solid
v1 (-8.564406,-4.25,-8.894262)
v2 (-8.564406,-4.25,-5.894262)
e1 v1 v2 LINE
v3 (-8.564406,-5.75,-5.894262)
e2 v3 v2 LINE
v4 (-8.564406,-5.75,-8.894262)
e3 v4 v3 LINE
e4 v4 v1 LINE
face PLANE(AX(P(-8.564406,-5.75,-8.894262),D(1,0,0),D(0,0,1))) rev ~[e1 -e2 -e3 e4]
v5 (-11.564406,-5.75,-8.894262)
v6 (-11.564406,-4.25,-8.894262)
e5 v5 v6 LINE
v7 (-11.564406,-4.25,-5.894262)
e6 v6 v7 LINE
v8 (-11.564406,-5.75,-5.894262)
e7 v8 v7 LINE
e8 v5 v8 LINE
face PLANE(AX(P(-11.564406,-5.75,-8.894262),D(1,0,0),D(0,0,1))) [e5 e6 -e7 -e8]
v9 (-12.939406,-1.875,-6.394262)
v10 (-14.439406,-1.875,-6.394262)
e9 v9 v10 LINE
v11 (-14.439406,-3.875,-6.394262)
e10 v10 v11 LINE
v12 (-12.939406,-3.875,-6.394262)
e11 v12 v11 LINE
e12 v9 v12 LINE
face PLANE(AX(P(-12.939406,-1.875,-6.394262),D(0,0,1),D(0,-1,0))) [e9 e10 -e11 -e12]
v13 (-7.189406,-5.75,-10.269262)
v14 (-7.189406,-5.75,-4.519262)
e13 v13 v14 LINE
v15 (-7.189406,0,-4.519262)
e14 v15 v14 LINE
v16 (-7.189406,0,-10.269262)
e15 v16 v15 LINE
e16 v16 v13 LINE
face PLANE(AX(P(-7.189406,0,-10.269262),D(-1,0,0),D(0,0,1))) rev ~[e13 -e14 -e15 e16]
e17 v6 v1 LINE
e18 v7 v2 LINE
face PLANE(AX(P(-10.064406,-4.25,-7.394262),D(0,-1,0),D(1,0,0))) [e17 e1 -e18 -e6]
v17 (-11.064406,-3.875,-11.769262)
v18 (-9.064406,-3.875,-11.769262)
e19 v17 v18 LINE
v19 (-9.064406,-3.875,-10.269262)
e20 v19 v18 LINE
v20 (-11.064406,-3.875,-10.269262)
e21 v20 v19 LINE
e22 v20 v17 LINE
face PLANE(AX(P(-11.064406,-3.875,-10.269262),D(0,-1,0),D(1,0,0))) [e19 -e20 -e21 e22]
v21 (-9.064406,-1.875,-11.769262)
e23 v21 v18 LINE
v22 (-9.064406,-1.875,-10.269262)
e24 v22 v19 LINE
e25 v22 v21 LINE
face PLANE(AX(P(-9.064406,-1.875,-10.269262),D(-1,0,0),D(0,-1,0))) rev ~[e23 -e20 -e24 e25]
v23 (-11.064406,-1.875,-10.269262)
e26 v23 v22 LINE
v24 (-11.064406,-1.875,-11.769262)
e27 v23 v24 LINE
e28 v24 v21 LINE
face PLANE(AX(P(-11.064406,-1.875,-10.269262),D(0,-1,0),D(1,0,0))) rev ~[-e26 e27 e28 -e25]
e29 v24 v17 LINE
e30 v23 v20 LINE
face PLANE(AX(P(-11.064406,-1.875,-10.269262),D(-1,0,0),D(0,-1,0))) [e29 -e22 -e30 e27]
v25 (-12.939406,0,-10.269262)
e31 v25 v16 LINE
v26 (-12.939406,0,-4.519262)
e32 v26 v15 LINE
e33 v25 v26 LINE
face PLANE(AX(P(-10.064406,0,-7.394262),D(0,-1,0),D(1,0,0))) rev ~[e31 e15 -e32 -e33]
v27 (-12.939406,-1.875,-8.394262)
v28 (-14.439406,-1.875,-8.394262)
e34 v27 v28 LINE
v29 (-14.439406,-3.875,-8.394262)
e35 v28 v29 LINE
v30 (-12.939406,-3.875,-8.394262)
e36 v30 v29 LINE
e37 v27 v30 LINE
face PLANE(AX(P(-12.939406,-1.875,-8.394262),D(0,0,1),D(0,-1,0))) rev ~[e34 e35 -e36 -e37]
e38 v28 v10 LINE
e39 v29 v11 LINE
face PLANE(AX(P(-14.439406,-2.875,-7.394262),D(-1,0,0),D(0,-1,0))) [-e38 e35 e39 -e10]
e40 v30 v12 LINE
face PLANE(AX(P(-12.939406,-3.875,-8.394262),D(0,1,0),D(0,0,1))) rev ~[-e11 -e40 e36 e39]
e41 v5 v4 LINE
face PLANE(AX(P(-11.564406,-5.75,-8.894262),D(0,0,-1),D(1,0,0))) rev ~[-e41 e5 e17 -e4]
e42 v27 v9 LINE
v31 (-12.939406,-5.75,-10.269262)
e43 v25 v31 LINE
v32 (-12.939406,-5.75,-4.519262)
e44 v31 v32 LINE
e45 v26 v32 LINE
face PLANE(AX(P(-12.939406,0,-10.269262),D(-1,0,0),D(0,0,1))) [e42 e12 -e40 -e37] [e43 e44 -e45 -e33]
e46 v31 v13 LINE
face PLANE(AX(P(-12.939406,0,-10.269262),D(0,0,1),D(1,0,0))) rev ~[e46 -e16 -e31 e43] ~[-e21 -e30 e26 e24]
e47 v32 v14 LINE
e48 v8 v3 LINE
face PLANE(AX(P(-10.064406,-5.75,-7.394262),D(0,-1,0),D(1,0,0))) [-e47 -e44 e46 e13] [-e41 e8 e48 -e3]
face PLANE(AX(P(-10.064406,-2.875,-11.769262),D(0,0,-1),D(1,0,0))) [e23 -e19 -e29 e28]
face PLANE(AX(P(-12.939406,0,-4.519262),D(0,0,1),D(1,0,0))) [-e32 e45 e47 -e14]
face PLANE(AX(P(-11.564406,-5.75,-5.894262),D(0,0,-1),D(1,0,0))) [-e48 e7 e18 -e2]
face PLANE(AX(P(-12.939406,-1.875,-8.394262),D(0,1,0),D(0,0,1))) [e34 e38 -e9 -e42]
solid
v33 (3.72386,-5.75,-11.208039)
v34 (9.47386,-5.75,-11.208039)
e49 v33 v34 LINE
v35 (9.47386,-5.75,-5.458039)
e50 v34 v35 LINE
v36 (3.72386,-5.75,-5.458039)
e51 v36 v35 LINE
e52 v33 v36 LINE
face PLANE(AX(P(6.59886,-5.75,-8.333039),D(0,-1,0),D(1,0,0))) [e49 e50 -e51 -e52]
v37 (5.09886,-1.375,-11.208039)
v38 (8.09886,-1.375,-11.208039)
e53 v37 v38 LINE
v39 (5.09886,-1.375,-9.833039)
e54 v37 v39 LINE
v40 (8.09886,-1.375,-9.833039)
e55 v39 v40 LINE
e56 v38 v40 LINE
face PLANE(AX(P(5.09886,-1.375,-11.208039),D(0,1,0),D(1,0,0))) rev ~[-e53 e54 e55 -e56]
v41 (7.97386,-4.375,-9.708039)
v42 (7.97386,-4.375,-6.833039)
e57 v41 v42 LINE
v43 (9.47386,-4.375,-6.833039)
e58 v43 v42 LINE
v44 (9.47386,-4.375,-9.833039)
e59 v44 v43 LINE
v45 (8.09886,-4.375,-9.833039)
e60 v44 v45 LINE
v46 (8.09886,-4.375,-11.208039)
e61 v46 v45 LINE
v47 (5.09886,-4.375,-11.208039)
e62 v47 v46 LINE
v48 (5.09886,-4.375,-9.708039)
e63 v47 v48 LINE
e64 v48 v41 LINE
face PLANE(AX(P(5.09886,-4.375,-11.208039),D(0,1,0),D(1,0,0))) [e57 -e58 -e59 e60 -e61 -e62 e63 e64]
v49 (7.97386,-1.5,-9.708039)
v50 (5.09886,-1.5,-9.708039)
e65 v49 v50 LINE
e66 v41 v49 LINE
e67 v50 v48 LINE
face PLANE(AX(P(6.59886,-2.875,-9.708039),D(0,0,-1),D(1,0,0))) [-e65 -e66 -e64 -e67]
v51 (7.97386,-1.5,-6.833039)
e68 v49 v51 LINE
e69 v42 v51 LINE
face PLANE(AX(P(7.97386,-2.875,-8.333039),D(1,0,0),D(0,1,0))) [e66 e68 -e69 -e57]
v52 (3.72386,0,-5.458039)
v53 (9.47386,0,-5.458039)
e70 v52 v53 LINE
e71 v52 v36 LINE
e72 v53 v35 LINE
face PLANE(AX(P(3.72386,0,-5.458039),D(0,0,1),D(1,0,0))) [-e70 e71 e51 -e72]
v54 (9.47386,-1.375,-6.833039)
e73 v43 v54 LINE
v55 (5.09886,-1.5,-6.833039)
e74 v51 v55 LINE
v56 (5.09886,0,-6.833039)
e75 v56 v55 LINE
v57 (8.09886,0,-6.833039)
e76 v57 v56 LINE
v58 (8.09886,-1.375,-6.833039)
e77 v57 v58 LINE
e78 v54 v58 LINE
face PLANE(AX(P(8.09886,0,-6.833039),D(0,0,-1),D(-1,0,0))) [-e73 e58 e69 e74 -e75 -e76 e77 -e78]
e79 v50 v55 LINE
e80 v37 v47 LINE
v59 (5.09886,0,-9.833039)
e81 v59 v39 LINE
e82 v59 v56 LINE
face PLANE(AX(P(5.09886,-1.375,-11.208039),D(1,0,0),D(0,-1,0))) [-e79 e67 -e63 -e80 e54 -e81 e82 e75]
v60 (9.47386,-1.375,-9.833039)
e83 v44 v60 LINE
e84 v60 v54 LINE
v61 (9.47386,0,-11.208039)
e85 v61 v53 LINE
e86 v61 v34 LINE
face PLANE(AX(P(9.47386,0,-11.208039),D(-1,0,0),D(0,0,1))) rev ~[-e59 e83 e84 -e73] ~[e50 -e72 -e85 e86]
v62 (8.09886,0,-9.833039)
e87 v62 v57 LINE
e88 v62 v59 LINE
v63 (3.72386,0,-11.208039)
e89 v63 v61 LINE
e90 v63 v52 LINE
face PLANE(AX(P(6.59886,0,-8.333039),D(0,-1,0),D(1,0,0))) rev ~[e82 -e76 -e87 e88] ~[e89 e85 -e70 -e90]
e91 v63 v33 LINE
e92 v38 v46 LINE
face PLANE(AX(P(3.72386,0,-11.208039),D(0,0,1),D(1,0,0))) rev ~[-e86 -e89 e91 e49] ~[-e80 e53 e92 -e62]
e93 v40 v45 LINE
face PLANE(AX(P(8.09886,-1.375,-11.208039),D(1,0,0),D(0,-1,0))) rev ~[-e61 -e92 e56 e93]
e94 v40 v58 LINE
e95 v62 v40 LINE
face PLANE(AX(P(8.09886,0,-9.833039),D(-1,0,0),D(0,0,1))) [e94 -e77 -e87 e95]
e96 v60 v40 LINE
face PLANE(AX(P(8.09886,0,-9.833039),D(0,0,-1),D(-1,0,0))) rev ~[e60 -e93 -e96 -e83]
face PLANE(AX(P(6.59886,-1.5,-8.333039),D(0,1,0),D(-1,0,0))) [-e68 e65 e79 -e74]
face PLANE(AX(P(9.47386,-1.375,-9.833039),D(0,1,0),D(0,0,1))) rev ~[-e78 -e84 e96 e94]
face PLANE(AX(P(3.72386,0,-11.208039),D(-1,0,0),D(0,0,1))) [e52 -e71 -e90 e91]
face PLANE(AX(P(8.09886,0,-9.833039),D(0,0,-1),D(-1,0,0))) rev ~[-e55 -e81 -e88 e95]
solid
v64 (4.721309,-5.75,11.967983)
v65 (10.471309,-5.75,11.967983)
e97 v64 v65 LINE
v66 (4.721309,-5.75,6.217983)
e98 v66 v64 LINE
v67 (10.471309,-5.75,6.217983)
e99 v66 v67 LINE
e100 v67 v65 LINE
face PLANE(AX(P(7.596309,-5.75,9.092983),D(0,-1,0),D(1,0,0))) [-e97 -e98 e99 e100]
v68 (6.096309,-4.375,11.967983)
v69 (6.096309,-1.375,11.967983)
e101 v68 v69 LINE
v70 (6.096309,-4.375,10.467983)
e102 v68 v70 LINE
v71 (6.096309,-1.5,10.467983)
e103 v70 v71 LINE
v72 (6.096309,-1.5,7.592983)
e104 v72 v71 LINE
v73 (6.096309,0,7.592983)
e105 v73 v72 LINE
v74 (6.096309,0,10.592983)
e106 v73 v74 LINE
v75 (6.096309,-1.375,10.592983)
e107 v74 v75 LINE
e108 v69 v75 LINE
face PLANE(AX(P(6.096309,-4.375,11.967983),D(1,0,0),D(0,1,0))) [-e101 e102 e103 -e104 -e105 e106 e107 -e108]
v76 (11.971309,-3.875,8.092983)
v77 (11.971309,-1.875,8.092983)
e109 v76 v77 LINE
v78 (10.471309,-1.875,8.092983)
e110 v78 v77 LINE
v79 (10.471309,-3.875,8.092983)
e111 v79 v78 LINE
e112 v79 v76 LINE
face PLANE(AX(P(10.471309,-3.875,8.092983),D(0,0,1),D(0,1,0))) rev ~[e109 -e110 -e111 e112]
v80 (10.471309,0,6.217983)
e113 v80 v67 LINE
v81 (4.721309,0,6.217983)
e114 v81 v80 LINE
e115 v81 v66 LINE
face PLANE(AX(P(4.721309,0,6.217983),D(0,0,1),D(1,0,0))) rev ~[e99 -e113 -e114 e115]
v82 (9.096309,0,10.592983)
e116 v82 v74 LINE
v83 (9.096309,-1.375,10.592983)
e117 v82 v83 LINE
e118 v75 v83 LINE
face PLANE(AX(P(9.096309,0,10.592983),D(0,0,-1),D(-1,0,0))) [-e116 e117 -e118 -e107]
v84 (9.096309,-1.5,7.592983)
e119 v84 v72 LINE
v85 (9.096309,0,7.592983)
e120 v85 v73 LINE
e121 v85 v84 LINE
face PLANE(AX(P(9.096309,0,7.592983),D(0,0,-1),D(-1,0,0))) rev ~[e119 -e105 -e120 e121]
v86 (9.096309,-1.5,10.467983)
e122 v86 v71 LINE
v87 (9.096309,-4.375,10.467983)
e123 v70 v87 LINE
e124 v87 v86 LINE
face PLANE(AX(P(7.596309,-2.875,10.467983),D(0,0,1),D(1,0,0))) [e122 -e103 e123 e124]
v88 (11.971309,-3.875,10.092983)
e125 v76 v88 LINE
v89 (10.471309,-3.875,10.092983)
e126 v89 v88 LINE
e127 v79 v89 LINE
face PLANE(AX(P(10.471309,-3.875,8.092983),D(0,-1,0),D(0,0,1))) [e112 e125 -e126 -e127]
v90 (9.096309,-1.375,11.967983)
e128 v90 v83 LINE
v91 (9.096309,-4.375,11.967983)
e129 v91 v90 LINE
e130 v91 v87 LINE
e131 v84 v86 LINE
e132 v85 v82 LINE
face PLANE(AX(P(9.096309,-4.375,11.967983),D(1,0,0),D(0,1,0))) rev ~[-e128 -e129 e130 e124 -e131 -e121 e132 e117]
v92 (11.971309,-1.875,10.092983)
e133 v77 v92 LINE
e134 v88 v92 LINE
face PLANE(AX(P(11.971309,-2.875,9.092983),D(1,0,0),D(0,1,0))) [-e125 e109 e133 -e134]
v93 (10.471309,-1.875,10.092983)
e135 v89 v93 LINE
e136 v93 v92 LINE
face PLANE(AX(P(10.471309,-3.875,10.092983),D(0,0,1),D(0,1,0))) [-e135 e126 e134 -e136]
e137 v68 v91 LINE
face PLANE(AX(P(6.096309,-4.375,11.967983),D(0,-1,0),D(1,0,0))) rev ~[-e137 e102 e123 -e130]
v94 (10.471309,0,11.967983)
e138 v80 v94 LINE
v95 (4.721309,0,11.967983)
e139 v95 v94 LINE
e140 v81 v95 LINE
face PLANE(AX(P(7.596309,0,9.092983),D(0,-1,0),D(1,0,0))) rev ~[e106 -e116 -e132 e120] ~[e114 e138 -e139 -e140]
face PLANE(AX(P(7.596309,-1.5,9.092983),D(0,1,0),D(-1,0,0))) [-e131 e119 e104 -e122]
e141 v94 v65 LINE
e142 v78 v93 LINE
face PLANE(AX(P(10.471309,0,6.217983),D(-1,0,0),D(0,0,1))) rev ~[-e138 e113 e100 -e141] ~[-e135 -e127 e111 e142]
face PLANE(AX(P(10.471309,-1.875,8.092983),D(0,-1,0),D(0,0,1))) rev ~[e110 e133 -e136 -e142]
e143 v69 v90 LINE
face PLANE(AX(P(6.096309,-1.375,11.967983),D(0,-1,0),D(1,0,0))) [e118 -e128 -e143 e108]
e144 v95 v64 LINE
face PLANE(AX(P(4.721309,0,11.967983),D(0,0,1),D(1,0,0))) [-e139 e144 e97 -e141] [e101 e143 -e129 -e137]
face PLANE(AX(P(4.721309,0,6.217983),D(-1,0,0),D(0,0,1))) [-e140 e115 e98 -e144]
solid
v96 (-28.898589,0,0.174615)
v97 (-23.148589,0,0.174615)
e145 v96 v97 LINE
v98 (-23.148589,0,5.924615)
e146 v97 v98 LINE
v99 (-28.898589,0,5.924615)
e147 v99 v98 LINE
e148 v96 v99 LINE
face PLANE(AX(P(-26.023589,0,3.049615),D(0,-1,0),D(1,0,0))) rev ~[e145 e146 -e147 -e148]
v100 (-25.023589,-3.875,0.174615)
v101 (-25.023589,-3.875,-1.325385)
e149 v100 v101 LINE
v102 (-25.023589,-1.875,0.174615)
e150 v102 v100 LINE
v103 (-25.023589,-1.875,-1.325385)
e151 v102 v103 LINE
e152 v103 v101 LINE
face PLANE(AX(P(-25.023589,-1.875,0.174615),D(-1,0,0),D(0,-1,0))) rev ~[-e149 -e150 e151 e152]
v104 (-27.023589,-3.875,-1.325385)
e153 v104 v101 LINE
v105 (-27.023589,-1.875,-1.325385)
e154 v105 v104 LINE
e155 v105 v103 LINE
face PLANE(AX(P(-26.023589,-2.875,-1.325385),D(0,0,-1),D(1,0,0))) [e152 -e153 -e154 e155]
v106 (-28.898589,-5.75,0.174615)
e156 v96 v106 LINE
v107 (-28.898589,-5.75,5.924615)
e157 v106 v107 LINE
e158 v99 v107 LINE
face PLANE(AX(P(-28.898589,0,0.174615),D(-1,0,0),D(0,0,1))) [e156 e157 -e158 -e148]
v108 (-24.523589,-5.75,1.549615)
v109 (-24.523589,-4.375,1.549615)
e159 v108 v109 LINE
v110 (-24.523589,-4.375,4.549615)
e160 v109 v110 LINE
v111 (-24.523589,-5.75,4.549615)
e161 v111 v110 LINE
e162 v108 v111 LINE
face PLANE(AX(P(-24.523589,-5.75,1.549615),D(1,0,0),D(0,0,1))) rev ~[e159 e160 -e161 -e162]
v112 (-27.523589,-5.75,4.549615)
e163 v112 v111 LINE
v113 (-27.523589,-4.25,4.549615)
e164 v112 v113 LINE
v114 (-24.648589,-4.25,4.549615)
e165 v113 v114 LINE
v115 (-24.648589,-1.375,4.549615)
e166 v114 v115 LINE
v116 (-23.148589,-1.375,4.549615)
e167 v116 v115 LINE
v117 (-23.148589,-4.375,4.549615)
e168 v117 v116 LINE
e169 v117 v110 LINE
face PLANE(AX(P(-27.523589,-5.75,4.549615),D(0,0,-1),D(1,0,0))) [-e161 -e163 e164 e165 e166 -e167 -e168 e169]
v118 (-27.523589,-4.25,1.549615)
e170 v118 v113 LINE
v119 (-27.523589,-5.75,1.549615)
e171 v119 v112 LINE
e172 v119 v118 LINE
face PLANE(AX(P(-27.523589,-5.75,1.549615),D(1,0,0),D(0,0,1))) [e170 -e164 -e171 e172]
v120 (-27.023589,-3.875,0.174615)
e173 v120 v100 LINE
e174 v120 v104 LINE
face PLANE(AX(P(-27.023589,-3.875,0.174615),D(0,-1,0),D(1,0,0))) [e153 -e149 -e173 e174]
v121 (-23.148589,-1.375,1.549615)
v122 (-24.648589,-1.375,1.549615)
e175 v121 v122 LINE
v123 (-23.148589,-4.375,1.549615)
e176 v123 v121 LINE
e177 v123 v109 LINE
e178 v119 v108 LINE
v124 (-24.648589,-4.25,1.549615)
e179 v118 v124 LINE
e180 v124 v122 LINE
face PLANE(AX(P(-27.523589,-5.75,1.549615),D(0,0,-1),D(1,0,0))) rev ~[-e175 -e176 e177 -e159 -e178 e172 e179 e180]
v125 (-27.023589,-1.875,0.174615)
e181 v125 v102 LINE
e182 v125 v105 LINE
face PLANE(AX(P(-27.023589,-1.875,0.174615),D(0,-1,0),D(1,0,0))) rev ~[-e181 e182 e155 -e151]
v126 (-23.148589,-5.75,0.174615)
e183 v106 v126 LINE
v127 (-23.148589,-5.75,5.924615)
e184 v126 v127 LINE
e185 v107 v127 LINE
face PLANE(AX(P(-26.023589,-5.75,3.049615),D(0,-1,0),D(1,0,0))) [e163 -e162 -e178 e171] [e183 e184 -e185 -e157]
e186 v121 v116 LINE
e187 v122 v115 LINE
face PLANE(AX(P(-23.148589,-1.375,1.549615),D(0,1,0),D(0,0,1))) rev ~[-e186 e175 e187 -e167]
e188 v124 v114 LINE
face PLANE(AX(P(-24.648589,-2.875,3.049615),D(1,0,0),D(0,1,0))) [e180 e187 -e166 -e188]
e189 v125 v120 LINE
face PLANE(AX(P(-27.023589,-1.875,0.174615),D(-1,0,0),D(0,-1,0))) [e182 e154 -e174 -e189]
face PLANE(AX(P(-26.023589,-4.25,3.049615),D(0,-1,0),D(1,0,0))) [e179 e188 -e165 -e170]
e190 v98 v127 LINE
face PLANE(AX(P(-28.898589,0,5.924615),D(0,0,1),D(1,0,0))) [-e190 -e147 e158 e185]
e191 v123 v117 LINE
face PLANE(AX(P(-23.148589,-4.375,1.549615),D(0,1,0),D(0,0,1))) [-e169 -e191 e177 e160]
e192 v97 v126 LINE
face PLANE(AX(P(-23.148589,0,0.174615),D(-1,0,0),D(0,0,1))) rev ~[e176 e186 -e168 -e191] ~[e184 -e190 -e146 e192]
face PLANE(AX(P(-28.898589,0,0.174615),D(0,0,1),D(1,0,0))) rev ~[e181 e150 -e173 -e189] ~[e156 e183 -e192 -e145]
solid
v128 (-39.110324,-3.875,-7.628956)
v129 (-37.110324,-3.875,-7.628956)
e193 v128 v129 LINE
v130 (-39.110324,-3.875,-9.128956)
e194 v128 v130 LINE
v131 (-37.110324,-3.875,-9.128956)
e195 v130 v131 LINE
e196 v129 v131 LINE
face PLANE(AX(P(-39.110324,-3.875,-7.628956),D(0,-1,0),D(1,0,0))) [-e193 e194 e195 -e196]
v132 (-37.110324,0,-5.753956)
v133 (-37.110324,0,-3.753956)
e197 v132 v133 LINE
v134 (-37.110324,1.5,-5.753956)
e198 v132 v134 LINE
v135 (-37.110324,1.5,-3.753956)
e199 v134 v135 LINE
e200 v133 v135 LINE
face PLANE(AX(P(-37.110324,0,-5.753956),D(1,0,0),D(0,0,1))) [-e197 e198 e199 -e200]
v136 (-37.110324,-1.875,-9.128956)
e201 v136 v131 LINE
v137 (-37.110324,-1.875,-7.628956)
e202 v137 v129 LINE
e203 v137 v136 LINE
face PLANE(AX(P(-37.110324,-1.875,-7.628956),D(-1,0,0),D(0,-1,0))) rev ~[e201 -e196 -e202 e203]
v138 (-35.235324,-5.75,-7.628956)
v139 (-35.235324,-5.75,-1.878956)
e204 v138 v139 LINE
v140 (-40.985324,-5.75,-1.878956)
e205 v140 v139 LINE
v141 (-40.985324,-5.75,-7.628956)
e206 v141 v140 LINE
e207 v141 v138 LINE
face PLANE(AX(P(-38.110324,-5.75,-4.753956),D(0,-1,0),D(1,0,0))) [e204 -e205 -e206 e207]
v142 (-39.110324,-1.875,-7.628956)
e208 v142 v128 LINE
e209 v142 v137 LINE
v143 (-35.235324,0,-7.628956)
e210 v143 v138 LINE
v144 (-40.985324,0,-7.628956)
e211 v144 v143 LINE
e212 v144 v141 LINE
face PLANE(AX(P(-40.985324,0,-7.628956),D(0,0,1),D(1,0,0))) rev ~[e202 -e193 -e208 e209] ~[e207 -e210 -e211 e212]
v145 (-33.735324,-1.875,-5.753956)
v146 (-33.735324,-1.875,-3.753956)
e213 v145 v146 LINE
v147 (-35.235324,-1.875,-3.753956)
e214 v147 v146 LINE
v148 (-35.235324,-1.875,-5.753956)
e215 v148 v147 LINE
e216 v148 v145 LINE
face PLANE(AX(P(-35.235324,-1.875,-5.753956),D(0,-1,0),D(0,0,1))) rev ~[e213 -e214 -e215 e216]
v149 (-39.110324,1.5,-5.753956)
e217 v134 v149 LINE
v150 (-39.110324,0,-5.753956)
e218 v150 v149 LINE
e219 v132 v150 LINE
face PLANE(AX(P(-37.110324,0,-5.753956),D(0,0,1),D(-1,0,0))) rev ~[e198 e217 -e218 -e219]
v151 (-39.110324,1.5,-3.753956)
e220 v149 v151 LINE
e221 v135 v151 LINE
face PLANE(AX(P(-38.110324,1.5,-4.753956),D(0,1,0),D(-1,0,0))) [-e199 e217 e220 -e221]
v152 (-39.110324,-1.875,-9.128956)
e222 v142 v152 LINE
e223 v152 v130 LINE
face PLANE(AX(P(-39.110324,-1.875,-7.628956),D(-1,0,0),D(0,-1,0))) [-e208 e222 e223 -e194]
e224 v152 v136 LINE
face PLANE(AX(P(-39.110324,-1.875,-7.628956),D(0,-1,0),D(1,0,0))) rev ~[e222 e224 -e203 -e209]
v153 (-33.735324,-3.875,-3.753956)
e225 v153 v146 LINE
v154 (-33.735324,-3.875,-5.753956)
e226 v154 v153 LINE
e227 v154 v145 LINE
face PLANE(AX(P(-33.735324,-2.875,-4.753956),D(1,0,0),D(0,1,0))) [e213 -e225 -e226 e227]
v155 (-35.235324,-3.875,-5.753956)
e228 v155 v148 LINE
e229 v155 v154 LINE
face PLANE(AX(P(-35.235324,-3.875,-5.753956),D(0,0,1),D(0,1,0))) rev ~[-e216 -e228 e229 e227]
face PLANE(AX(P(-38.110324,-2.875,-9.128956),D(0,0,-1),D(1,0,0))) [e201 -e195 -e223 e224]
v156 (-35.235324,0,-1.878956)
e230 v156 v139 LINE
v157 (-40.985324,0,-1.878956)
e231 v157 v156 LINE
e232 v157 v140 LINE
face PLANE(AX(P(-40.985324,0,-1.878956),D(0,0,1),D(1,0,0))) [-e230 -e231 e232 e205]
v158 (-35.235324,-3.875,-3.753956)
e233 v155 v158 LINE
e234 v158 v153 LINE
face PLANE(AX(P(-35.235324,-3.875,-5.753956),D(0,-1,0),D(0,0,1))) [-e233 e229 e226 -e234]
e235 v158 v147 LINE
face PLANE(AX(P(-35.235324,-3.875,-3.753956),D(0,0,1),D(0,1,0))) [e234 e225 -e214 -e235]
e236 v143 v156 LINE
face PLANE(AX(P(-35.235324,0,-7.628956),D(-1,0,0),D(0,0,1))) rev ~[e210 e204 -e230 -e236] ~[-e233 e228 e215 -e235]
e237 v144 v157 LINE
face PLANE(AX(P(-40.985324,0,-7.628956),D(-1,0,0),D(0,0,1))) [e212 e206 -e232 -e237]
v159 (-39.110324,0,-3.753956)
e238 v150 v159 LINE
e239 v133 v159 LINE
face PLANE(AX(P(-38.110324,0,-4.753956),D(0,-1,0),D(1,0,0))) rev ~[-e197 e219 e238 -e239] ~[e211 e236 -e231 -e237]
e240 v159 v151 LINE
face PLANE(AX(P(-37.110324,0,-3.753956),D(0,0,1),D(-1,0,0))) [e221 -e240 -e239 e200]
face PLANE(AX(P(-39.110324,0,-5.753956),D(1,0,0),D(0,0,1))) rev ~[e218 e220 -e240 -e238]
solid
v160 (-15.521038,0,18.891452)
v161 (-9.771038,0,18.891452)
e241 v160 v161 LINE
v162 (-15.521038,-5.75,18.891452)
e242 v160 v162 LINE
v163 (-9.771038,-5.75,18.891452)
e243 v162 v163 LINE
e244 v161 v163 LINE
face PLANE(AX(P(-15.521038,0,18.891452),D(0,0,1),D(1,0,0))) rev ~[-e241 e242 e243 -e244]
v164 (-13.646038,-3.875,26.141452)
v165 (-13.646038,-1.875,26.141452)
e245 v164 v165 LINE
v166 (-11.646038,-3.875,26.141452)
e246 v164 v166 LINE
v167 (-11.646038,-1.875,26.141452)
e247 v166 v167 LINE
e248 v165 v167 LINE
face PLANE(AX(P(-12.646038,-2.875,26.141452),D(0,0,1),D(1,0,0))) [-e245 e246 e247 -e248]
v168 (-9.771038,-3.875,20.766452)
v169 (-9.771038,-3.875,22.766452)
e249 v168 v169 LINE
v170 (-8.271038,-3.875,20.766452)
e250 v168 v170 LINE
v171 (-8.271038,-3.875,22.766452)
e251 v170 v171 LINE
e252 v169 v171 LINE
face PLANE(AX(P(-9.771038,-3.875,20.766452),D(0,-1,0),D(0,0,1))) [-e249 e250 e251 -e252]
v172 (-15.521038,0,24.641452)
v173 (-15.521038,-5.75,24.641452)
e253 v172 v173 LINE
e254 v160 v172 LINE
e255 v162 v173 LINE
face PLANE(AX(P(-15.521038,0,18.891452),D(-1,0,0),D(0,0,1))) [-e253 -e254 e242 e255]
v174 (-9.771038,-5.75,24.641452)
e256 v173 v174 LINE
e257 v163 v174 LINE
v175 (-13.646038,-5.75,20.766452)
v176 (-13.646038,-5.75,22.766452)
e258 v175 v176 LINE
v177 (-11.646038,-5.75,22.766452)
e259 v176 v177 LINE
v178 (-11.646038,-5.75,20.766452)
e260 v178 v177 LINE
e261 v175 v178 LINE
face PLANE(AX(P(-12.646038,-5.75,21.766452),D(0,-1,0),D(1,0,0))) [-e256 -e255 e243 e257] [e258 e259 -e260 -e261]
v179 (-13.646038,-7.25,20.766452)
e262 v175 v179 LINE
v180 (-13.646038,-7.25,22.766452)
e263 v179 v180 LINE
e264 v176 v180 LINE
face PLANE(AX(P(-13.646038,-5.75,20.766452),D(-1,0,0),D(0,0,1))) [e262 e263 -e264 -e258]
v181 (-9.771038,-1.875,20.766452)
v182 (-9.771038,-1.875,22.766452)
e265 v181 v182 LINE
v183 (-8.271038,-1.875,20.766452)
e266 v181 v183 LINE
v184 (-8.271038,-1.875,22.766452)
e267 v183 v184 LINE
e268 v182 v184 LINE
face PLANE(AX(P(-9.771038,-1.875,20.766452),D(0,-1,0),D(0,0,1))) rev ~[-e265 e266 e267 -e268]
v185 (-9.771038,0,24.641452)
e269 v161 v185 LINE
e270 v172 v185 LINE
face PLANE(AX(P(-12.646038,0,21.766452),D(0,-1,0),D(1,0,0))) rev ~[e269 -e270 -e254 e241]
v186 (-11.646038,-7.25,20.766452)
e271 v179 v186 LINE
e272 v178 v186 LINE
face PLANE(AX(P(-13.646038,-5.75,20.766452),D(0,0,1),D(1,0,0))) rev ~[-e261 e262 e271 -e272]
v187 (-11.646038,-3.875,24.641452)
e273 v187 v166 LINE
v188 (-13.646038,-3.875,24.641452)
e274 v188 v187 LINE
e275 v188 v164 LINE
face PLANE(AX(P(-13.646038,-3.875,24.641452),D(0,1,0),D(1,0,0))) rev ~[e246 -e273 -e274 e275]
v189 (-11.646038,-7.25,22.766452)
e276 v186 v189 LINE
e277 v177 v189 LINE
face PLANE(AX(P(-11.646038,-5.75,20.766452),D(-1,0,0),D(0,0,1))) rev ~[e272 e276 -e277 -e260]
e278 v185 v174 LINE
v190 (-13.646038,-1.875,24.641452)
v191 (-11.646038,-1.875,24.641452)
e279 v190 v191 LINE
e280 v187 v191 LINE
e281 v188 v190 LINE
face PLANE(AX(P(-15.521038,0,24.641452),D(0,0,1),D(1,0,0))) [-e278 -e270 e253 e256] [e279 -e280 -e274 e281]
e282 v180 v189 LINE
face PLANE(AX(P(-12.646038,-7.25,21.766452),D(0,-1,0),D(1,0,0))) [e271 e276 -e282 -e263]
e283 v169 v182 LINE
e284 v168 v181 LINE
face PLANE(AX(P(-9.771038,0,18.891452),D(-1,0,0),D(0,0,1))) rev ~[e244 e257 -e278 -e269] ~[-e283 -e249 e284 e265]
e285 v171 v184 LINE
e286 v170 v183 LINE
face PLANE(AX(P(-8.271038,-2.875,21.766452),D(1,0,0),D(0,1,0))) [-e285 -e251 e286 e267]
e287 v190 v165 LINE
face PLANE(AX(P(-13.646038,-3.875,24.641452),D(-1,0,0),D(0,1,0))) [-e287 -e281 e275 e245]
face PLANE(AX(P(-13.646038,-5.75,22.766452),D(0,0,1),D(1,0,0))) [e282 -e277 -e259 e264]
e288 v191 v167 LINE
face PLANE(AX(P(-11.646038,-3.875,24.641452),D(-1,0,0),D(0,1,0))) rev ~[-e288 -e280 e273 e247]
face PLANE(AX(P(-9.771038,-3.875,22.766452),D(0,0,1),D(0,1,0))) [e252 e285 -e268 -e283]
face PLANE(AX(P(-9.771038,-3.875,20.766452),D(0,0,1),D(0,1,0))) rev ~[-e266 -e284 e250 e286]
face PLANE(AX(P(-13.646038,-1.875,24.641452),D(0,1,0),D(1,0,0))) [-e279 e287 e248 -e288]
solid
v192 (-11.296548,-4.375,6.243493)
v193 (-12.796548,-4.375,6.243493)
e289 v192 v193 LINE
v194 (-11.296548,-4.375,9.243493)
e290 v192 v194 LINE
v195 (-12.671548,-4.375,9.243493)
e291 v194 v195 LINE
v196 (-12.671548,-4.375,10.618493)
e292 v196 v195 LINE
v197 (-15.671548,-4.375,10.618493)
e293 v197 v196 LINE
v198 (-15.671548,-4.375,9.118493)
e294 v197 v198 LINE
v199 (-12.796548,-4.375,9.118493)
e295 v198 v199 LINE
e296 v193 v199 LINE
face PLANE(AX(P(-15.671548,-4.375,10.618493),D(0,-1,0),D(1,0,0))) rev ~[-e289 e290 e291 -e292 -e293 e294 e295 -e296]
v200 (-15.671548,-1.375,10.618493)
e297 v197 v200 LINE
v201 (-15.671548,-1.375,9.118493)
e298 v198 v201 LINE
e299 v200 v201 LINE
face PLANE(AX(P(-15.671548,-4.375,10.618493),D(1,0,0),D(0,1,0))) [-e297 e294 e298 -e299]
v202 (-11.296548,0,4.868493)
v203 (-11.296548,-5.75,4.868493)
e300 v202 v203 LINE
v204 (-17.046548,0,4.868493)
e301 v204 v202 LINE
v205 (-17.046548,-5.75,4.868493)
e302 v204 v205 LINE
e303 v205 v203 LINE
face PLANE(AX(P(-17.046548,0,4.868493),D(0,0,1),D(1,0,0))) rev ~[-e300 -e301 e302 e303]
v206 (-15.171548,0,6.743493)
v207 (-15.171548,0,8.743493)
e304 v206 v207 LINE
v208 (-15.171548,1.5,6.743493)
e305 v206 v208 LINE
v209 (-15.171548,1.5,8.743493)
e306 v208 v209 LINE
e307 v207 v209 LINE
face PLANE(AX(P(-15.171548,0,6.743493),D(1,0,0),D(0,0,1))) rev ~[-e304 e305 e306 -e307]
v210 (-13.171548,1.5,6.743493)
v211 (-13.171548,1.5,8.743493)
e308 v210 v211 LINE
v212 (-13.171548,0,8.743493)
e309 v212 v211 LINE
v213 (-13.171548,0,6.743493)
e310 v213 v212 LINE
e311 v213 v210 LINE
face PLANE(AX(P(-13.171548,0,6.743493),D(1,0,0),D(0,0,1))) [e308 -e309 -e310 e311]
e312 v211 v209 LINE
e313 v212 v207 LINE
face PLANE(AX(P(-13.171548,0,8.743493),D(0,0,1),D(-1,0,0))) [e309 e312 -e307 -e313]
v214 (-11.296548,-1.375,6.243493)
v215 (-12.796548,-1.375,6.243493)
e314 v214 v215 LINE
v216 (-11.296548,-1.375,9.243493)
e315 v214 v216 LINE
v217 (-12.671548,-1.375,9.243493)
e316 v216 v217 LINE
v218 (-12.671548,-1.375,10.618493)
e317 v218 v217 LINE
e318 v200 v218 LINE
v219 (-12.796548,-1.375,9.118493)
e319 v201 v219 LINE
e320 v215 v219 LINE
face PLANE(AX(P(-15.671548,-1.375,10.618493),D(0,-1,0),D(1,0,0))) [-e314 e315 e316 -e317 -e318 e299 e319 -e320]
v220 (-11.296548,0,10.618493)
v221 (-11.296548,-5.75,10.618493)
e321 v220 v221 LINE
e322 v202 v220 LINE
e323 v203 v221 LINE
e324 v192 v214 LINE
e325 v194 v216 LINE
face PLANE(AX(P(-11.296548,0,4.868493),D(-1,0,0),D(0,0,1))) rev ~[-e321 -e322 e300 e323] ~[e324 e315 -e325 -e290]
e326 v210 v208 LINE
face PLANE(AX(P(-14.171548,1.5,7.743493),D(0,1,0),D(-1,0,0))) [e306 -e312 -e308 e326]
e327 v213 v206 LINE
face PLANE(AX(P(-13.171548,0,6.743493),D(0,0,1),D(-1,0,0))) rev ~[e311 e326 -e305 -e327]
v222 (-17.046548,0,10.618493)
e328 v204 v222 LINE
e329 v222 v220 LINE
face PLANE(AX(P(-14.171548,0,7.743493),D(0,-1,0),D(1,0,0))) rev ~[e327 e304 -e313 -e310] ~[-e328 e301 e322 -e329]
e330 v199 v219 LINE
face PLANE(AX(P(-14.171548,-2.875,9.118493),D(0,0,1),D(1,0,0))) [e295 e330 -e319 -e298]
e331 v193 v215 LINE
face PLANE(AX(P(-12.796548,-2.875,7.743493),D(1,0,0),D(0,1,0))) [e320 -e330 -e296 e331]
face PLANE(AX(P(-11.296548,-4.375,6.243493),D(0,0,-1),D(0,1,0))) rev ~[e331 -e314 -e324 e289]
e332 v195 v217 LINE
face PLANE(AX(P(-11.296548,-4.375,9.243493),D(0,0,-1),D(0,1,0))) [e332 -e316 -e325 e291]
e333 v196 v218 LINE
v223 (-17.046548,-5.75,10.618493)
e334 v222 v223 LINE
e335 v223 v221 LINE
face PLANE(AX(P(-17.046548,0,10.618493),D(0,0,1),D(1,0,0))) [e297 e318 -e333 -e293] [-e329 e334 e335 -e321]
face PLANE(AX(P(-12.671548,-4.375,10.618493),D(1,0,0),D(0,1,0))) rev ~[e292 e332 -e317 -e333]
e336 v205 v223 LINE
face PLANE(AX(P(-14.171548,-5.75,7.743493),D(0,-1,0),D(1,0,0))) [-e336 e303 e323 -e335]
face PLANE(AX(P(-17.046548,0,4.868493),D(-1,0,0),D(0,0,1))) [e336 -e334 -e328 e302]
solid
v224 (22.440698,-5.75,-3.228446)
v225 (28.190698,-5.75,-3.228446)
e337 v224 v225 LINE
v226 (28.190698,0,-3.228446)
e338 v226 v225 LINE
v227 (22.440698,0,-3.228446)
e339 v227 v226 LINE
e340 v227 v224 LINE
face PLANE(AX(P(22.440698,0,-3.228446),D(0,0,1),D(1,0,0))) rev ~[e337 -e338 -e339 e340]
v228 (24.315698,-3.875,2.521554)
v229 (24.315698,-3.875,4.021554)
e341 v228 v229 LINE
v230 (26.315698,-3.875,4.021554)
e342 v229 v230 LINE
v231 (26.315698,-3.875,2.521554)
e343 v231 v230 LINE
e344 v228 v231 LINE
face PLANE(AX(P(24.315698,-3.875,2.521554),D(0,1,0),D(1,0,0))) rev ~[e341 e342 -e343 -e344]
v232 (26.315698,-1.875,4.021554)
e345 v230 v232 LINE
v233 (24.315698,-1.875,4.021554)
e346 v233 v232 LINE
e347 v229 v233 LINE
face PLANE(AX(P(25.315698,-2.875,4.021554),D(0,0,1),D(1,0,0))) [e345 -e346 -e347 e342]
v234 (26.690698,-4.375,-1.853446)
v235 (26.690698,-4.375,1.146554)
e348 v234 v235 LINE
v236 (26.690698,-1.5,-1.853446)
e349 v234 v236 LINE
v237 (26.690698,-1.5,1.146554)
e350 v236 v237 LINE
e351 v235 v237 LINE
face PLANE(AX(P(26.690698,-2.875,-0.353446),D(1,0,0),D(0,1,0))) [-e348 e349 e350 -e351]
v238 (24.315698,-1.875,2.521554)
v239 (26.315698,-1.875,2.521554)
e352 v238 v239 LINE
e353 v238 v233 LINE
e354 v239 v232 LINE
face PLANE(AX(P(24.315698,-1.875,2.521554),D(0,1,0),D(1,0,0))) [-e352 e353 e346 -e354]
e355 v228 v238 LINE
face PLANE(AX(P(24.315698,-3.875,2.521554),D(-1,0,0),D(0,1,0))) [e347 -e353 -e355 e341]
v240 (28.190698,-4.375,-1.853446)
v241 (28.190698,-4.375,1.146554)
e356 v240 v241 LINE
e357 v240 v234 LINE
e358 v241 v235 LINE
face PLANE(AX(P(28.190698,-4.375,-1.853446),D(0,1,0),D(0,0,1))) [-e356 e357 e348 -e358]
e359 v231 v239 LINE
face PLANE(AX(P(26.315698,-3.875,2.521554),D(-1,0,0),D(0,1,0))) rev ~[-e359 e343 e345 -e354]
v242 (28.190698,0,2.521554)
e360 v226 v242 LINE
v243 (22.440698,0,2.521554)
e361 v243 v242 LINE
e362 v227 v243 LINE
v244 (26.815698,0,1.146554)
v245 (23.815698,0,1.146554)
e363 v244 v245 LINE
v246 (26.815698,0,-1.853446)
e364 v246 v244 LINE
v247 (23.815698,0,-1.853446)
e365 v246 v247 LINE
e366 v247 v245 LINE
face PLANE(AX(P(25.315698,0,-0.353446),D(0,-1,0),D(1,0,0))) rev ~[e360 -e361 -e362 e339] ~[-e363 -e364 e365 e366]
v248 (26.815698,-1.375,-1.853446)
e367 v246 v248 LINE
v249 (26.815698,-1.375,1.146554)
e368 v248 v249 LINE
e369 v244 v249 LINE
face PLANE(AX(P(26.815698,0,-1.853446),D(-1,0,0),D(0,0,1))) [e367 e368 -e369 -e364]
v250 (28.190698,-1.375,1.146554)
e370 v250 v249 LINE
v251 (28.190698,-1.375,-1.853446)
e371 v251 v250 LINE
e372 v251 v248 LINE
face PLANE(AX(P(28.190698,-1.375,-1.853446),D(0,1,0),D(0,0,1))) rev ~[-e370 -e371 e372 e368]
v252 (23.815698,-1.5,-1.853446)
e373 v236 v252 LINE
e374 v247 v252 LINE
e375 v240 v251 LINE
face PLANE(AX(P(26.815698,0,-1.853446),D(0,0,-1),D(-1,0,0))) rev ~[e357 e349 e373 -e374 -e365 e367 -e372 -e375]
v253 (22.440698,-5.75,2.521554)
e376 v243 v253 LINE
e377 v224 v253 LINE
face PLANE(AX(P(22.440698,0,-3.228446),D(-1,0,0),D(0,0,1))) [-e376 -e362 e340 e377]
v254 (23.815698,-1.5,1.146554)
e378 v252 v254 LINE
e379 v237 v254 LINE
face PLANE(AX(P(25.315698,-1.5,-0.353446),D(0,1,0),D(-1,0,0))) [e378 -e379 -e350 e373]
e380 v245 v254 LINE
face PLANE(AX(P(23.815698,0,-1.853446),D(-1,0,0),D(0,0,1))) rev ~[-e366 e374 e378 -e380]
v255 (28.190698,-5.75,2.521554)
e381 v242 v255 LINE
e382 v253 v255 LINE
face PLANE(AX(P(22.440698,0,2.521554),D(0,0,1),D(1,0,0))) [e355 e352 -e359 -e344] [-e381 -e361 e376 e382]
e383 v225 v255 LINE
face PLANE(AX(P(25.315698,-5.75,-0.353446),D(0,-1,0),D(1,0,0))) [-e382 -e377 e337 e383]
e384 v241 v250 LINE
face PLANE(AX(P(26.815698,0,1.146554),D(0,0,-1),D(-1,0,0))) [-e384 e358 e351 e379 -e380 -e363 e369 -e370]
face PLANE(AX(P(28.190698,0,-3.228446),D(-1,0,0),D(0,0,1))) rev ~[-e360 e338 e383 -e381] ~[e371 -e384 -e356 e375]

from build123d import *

# Parameters (mm, degrees)
F0_W      = 5.75
F0_H      = 5.75
F1_DEPTH  = 5.75
F2_W      = 3
F2_H      = 3
F4_DEPTH  = 1.5
F3_W      = 2
F3_H      = 2
F5_DEPTH  = 1.5
F6_W      = 3
F6_H      = 3
F7_DEPTH  = 1.5
F8_W      = 2
F8_H      = 2
F9_DEPTH  = 1.5
F10_W     = 2
F10_H     = 2
F11_DEPTH = 1.5
F12_W     = 2
F12_H     = 2
F13_DEPTH = 1.5
F14_W     = 3
F14_H     = 3
F15_DEPTH = 1.5
F16_W     = 2
F16_H     = 2
F17_DEPTH = 1.5
F18_W     = 2
F18_H     = 2
F19_DEPTH = 1.5
F20_W     = 3
F20_H     = 3
F21_DEPTH = 1.5
F22_W     = 3
F22_H     = 3
F23_DEPTH = 1.5
F24_DEPTH = 1.5
F25_W     = 2
F25_H     = 2
F26_DEPTH = 1.5
F28_W     = 2
F28_H     = 2
F29_DEPTH = 1.5
F27_W     = 2
F27_H     = 2
F30_DEPTH = 1.5
F31_W     = 2
F31_H     = 2
F32_DEPTH = 1.5
F33_W     = 3
F33_H     = 3
F34_DEPTH = 1.5
F35_W     = 3
F35_H     = 3
F36_DEPTH = 1.5
F37_W     = 2
F37_H     = 2
F38_DEPTH = 1.5
F39_W     = 2
F39_H     = 2
F40_DEPTH = 1.5
F41_W     = 3
F41_H     = 3
F42_DEPTH = 1.5
F43_W     = 3
F43_H     = 3
F44_DEPTH = 1.5
F45_W     = 3
F45_H     = 3
F46_DEPTH = 1.5
F47_W     = 3
F47_H     = 3
F48_DEPTH = 1.5
F49_W     = 3
F49_H     = 3
F50_DEPTH = 1.5


# Not quite as in the source:
# - a feature names something its author has since deleted; it is built from what else it names


with BuildPart() as f1:
    # F0 (on Front) → F1 (new body)
    with BuildSketch(Plane.XZ):
        with Locations((-12.646038468, 21.76645218)):
            Rectangle(F0_W, F0_H)
    extrude(amount=F1_DEPTH)

    # F22 (on face) → F24 (cut)
    with BuildSketch(Plane(origin=(0, 0, 0), x_dir=(-1, 0, 0), z_dir=(0, 1, 0))):
        with Locations((-25.3156977051, -0.3534462649)):
            Rectangle(F22_W, F22_H)
    extrude(amount=-F24_DEPTH, mode=Mode.SUBTRACT)

    # F28 (on face) → F29 (join)
    with BuildSketch(Plane.XY.offset(24.64145218)):
        with Locations((-12.646038468, -2.875)):
            Rectangle(F28_W, F28_H)
    extrude(amount=F29_DEPTH)

    # F27 (on face) → F30 (join)
    with BuildSketch(Plane.XZ.offset(5.75)):
        with Locations((-12.646038468, 21.76645218)):
            Rectangle(F27_W, F27_H)
    extrude(amount=F30_DEPTH)

    # F31 (on face) → F32 (join)
    with BuildSketch(Plane.YZ.offset(-9.771038468)):
        with Locations((-2.875, 21.76645218)):
            Rectangle(F31_W, F31_H)
    extrude(amount=F32_DEPTH)


with BuildPart() as f1b:
    # F0 (on Front) → F1, piece 2 (new body)
    with BuildSketch(Plane.XZ):
        with Locations((-14.1715484071, 7.7434927479)):
            Rectangle(F0_W, F0_H)
    extrude(amount=F1_DEPTH)

    # F39 (on face) → F40 (join)
    with BuildSketch(Plane(origin=(0, 0, 0), x_dir=(-1, 0, 0), z_dir=(0, 1, 0))):
        with Locations((14.1715484071, 7.7434927479)):
            Rectangle(F39_W, F39_H)
    extrude(amount=F40_DEPTH)

    # F41 (on face) → F42 (cut)
    with BuildSketch(Plane.XY.offset(10.6184927479)):
        with Locations((-14.1715484071, -2.875)):
            Rectangle(F41_W, F41_H)
    extrude(amount=-F42_DEPTH, mode=Mode.SUBTRACT)

    # F43 (on face) → F44 (cut)
    with BuildSketch(Plane.YZ.offset(-11.2965484071)):
        with Locations((-2.875, 7.7434927479)):
            Rectangle(F43_W, F43_H)
    extrude(amount=-F44_DEPTH, mode=Mode.SUBTRACT)


with BuildPart() as f1c:
    # F0 (on Front) → F1, piece 3 (new body)
    with BuildSketch(Plane.XZ):
        with Locations((-26.0235892455, 3.0496152631)):
            Rectangle(F0_W, F0_H)
    extrude(amount=F1_DEPTH)

    # F2 (on face) → F4 (cut)
    with BuildSketch(Plane.XZ.offset(5.75)):
        with Locations((-26.0235892455, 3.0496152631)):
            Rectangle(F2_W, F2_H)
    extrude(amount=-F4_DEPTH, mode=Mode.SUBTRACT)

    # F3 (on face) → F5 (join)
    with BuildSketch(Plane(origin=(0, 0, 0.1746152631), x_dir=(1, 0, 0), z_dir=(0, 0, -1))):
        with Locations((-26.0235892455, 2.875)):
            Rectangle(F3_W, F3_H)
    extrude(amount=F5_DEPTH)

    # F6 (on face) → F7 (cut)
    with BuildSketch(Plane.YZ.offset(-23.1485892455)):
        with Locations((-2.875, 3.0496152631)):
            Rectangle(F6_W, F6_H)
    extrude(amount=-F7_DEPTH, mode=Mode.SUBTRACT)


with BuildPart() as f1d:
    # F0 (on Front) → F1, piece 4 (new body)
    with BuildSketch(Plane.XZ):
        with Locations((-38.1103243368, -4.7539562041)):
            Rectangle(F0_W, F0_H)
    extrude(amount=F1_DEPTH)

    # F8 (on face) → F9 (join)
    with BuildSketch(Plane(origin=(0, 0, 0), x_dir=(-1, 0, 0), z_dir=(0, 1, 0))):
        with Locations((38.1103243368, -4.7539562041)):
            Rectangle(F8_W, F8_H)
    extrude(amount=F9_DEPTH)

    # F10 (on face) → F11 (join)
    with BuildSketch(Plane.YZ.offset(-35.2353243368)):
        with Locations((-2.875, -4.7539562041)):
            Rectangle(F10_W, F10_H)
    extrude(amount=F11_DEPTH)

    # F12 (on face) → F13 (join)
    with BuildSketch(Plane(origin=(0, 0, -7.6289562041), x_dir=(1, 0, 0), z_dir=(0, 0, -1))):
        with Locations((-38.1103243368, 2.875)):
            Rectangle(F12_W, F12_H)
    extrude(amount=F13_DEPTH)


with BuildPart() as f1e:
    # F0 (on Front) → F1, piece 5 (new body)
    with BuildSketch(Plane.XZ):
        with Locations((-10.0644060136, -7.3942619512)):
            Rectangle(F0_W, F0_H)
    extrude(amount=F1_DEPTH)

    # F14 (on face) → F15 (cut)
    with BuildSketch(Plane.XZ.offset(5.75)):
        with Locations((-10.0644060136, -7.3942619512)):
            Rectangle(F14_W, F14_H)
    extrude(amount=-F15_DEPTH, mode=Mode.SUBTRACT)

    # F16 (on face) → F17 (join)
    with BuildSketch(Plane(origin=(0, 0, -10.2692619512), x_dir=(1, 0, 0), z_dir=(0, 0, -1))):
        with Locations((-10.0644060136, 2.875)):
            Rectangle(F16_W, F16_H)
    extrude(amount=F17_DEPTH)

    # F18 (on face) → F19 (join)
    with BuildSketch(Plane(origin=(-12.9394060136, 0, 0), x_dir=(0, -1, 0), z_dir=(-1, 0, 0))):
        with Locations((2.875, -7.3942619512)):
            Rectangle(F18_W, F18_H)
    extrude(amount=F19_DEPTH)


with BuildPart() as f1f:
    # F0 (on Front) → F1, piece 6 (new body)
    with BuildSketch(Plane.XZ):
        with Locations((6.5988599769, -8.3330389627)):
            Rectangle(F0_W, F0_H)
    extrude(amount=F1_DEPTH)

    # F45 (on face) → F46 (cut)
    with BuildSketch(Plane.YZ.offset(9.4738599769)):
        with Locations((-2.875, -8.3330389627)):
            Rectangle(F45_W, F45_H)
    extrude(amount=-F46_DEPTH, mode=Mode.SUBTRACT)

    # F47 (on face) → F48 (cut)
    with BuildSketch(Plane(origin=(0, 0, 0), x_dir=(-1, 0, 0), z_dir=(0, 1, 0))):
        with Locations((-6.5988599769, -8.3330389627)):
            Rectangle(F47_W, F47_H)
    extrude(amount=-F48_DEPTH, mode=Mode.SUBTRACT)

    # F49 (on face) → F50 (cut)
    with BuildSketch(Plane(origin=(0, 0, -11.2080389627), x_dir=(1, 0, 0), z_dir=(0, 0, -1))):
        with Locations((6.5988599769, 2.875)):
            Rectangle(F49_W, F49_H)
    extrude(amount=-F50_DEPTH, mode=Mode.SUBTRACT)


with BuildPart() as f1g:
    # F0 (on Front) → F1, piece 7 (new body)
    with BuildSketch(Plane.XZ):
        with Locations((7.5963086585, 9.0929825383)):
            Rectangle(F0_W, F0_H)
    extrude(amount=F1_DEPTH)

    # F33 (on face) → F34 (cut)
    with BuildSketch(Plane.XY.offset(11.9679825383)):
        with Locations((7.5963086585, -2.875)):
            Rectangle(F33_W, F33_H)
    extrude(amount=-F34_DEPTH, mode=Mode.SUBTRACT)

    # F35 (on face) → F36 (cut)
    with BuildSketch(Plane(origin=(0, 0, 0), x_dir=(-1, 0, 0), z_dir=(0, 1, 0))):
        with Locations((-7.5963086585, 9.0929825383)):
            Rectangle(F35_W, F35_H)
    extrude(amount=-F36_DEPTH, mode=Mode.SUBTRACT)

    # F37 (on face) → F38 (join)
    with BuildSketch(Plane.YZ.offset(10.4713086585)):
        with Locations((-2.875, 9.0929825383)):
            Rectangle(F37_W, F37_H)
    extrude(amount=F38_DEPTH)


with BuildPart() as f1h:
    # F0 (on Front) → F1, piece 8 (new body)
    with BuildSketch(Plane.XZ):
        with Locations((25.3156977051, -0.3534462649)):
            Rectangle(F0_W, F0_H)
    extrude(amount=F1_DEPTH)

    # F20 (on face) → F21 (cut)
    with BuildSketch(Plane.YZ.offset(28.1906977051)):
        with Locations((-2.875, -0.3534462649)):
            Rectangle(F20_W, F20_H)
    extrude(amount=-F21_DEPTH, mode=Mode.SUBTRACT)

    # F22 (on face) → F23 (cut)
    with BuildSketch(Plane(origin=(0, 0, 0), x_dir=(-1, 0, 0), z_dir=(0, 1, 0))):
        with Locations((-25.3156977051, -0.3534462649)):
            Rectangle(F22_W, F22_H)
    extrude(amount=-F23_DEPTH, mode=Mode.SUBTRACT)

    # F25 (on face) → F26 (join)
    with BuildSketch(Plane.XY.offset(2.5215537351)):
        with Locations((25.3156977051, -2.875)):
            Rectangle(F25_W, F25_H)
    extrude(amount=F26_DEPTH)


solid = Compound([f1.part, f1b.part, f1c.part, f1d.part, f1e.part, f1f.part, f1g.part, f1h.part])
